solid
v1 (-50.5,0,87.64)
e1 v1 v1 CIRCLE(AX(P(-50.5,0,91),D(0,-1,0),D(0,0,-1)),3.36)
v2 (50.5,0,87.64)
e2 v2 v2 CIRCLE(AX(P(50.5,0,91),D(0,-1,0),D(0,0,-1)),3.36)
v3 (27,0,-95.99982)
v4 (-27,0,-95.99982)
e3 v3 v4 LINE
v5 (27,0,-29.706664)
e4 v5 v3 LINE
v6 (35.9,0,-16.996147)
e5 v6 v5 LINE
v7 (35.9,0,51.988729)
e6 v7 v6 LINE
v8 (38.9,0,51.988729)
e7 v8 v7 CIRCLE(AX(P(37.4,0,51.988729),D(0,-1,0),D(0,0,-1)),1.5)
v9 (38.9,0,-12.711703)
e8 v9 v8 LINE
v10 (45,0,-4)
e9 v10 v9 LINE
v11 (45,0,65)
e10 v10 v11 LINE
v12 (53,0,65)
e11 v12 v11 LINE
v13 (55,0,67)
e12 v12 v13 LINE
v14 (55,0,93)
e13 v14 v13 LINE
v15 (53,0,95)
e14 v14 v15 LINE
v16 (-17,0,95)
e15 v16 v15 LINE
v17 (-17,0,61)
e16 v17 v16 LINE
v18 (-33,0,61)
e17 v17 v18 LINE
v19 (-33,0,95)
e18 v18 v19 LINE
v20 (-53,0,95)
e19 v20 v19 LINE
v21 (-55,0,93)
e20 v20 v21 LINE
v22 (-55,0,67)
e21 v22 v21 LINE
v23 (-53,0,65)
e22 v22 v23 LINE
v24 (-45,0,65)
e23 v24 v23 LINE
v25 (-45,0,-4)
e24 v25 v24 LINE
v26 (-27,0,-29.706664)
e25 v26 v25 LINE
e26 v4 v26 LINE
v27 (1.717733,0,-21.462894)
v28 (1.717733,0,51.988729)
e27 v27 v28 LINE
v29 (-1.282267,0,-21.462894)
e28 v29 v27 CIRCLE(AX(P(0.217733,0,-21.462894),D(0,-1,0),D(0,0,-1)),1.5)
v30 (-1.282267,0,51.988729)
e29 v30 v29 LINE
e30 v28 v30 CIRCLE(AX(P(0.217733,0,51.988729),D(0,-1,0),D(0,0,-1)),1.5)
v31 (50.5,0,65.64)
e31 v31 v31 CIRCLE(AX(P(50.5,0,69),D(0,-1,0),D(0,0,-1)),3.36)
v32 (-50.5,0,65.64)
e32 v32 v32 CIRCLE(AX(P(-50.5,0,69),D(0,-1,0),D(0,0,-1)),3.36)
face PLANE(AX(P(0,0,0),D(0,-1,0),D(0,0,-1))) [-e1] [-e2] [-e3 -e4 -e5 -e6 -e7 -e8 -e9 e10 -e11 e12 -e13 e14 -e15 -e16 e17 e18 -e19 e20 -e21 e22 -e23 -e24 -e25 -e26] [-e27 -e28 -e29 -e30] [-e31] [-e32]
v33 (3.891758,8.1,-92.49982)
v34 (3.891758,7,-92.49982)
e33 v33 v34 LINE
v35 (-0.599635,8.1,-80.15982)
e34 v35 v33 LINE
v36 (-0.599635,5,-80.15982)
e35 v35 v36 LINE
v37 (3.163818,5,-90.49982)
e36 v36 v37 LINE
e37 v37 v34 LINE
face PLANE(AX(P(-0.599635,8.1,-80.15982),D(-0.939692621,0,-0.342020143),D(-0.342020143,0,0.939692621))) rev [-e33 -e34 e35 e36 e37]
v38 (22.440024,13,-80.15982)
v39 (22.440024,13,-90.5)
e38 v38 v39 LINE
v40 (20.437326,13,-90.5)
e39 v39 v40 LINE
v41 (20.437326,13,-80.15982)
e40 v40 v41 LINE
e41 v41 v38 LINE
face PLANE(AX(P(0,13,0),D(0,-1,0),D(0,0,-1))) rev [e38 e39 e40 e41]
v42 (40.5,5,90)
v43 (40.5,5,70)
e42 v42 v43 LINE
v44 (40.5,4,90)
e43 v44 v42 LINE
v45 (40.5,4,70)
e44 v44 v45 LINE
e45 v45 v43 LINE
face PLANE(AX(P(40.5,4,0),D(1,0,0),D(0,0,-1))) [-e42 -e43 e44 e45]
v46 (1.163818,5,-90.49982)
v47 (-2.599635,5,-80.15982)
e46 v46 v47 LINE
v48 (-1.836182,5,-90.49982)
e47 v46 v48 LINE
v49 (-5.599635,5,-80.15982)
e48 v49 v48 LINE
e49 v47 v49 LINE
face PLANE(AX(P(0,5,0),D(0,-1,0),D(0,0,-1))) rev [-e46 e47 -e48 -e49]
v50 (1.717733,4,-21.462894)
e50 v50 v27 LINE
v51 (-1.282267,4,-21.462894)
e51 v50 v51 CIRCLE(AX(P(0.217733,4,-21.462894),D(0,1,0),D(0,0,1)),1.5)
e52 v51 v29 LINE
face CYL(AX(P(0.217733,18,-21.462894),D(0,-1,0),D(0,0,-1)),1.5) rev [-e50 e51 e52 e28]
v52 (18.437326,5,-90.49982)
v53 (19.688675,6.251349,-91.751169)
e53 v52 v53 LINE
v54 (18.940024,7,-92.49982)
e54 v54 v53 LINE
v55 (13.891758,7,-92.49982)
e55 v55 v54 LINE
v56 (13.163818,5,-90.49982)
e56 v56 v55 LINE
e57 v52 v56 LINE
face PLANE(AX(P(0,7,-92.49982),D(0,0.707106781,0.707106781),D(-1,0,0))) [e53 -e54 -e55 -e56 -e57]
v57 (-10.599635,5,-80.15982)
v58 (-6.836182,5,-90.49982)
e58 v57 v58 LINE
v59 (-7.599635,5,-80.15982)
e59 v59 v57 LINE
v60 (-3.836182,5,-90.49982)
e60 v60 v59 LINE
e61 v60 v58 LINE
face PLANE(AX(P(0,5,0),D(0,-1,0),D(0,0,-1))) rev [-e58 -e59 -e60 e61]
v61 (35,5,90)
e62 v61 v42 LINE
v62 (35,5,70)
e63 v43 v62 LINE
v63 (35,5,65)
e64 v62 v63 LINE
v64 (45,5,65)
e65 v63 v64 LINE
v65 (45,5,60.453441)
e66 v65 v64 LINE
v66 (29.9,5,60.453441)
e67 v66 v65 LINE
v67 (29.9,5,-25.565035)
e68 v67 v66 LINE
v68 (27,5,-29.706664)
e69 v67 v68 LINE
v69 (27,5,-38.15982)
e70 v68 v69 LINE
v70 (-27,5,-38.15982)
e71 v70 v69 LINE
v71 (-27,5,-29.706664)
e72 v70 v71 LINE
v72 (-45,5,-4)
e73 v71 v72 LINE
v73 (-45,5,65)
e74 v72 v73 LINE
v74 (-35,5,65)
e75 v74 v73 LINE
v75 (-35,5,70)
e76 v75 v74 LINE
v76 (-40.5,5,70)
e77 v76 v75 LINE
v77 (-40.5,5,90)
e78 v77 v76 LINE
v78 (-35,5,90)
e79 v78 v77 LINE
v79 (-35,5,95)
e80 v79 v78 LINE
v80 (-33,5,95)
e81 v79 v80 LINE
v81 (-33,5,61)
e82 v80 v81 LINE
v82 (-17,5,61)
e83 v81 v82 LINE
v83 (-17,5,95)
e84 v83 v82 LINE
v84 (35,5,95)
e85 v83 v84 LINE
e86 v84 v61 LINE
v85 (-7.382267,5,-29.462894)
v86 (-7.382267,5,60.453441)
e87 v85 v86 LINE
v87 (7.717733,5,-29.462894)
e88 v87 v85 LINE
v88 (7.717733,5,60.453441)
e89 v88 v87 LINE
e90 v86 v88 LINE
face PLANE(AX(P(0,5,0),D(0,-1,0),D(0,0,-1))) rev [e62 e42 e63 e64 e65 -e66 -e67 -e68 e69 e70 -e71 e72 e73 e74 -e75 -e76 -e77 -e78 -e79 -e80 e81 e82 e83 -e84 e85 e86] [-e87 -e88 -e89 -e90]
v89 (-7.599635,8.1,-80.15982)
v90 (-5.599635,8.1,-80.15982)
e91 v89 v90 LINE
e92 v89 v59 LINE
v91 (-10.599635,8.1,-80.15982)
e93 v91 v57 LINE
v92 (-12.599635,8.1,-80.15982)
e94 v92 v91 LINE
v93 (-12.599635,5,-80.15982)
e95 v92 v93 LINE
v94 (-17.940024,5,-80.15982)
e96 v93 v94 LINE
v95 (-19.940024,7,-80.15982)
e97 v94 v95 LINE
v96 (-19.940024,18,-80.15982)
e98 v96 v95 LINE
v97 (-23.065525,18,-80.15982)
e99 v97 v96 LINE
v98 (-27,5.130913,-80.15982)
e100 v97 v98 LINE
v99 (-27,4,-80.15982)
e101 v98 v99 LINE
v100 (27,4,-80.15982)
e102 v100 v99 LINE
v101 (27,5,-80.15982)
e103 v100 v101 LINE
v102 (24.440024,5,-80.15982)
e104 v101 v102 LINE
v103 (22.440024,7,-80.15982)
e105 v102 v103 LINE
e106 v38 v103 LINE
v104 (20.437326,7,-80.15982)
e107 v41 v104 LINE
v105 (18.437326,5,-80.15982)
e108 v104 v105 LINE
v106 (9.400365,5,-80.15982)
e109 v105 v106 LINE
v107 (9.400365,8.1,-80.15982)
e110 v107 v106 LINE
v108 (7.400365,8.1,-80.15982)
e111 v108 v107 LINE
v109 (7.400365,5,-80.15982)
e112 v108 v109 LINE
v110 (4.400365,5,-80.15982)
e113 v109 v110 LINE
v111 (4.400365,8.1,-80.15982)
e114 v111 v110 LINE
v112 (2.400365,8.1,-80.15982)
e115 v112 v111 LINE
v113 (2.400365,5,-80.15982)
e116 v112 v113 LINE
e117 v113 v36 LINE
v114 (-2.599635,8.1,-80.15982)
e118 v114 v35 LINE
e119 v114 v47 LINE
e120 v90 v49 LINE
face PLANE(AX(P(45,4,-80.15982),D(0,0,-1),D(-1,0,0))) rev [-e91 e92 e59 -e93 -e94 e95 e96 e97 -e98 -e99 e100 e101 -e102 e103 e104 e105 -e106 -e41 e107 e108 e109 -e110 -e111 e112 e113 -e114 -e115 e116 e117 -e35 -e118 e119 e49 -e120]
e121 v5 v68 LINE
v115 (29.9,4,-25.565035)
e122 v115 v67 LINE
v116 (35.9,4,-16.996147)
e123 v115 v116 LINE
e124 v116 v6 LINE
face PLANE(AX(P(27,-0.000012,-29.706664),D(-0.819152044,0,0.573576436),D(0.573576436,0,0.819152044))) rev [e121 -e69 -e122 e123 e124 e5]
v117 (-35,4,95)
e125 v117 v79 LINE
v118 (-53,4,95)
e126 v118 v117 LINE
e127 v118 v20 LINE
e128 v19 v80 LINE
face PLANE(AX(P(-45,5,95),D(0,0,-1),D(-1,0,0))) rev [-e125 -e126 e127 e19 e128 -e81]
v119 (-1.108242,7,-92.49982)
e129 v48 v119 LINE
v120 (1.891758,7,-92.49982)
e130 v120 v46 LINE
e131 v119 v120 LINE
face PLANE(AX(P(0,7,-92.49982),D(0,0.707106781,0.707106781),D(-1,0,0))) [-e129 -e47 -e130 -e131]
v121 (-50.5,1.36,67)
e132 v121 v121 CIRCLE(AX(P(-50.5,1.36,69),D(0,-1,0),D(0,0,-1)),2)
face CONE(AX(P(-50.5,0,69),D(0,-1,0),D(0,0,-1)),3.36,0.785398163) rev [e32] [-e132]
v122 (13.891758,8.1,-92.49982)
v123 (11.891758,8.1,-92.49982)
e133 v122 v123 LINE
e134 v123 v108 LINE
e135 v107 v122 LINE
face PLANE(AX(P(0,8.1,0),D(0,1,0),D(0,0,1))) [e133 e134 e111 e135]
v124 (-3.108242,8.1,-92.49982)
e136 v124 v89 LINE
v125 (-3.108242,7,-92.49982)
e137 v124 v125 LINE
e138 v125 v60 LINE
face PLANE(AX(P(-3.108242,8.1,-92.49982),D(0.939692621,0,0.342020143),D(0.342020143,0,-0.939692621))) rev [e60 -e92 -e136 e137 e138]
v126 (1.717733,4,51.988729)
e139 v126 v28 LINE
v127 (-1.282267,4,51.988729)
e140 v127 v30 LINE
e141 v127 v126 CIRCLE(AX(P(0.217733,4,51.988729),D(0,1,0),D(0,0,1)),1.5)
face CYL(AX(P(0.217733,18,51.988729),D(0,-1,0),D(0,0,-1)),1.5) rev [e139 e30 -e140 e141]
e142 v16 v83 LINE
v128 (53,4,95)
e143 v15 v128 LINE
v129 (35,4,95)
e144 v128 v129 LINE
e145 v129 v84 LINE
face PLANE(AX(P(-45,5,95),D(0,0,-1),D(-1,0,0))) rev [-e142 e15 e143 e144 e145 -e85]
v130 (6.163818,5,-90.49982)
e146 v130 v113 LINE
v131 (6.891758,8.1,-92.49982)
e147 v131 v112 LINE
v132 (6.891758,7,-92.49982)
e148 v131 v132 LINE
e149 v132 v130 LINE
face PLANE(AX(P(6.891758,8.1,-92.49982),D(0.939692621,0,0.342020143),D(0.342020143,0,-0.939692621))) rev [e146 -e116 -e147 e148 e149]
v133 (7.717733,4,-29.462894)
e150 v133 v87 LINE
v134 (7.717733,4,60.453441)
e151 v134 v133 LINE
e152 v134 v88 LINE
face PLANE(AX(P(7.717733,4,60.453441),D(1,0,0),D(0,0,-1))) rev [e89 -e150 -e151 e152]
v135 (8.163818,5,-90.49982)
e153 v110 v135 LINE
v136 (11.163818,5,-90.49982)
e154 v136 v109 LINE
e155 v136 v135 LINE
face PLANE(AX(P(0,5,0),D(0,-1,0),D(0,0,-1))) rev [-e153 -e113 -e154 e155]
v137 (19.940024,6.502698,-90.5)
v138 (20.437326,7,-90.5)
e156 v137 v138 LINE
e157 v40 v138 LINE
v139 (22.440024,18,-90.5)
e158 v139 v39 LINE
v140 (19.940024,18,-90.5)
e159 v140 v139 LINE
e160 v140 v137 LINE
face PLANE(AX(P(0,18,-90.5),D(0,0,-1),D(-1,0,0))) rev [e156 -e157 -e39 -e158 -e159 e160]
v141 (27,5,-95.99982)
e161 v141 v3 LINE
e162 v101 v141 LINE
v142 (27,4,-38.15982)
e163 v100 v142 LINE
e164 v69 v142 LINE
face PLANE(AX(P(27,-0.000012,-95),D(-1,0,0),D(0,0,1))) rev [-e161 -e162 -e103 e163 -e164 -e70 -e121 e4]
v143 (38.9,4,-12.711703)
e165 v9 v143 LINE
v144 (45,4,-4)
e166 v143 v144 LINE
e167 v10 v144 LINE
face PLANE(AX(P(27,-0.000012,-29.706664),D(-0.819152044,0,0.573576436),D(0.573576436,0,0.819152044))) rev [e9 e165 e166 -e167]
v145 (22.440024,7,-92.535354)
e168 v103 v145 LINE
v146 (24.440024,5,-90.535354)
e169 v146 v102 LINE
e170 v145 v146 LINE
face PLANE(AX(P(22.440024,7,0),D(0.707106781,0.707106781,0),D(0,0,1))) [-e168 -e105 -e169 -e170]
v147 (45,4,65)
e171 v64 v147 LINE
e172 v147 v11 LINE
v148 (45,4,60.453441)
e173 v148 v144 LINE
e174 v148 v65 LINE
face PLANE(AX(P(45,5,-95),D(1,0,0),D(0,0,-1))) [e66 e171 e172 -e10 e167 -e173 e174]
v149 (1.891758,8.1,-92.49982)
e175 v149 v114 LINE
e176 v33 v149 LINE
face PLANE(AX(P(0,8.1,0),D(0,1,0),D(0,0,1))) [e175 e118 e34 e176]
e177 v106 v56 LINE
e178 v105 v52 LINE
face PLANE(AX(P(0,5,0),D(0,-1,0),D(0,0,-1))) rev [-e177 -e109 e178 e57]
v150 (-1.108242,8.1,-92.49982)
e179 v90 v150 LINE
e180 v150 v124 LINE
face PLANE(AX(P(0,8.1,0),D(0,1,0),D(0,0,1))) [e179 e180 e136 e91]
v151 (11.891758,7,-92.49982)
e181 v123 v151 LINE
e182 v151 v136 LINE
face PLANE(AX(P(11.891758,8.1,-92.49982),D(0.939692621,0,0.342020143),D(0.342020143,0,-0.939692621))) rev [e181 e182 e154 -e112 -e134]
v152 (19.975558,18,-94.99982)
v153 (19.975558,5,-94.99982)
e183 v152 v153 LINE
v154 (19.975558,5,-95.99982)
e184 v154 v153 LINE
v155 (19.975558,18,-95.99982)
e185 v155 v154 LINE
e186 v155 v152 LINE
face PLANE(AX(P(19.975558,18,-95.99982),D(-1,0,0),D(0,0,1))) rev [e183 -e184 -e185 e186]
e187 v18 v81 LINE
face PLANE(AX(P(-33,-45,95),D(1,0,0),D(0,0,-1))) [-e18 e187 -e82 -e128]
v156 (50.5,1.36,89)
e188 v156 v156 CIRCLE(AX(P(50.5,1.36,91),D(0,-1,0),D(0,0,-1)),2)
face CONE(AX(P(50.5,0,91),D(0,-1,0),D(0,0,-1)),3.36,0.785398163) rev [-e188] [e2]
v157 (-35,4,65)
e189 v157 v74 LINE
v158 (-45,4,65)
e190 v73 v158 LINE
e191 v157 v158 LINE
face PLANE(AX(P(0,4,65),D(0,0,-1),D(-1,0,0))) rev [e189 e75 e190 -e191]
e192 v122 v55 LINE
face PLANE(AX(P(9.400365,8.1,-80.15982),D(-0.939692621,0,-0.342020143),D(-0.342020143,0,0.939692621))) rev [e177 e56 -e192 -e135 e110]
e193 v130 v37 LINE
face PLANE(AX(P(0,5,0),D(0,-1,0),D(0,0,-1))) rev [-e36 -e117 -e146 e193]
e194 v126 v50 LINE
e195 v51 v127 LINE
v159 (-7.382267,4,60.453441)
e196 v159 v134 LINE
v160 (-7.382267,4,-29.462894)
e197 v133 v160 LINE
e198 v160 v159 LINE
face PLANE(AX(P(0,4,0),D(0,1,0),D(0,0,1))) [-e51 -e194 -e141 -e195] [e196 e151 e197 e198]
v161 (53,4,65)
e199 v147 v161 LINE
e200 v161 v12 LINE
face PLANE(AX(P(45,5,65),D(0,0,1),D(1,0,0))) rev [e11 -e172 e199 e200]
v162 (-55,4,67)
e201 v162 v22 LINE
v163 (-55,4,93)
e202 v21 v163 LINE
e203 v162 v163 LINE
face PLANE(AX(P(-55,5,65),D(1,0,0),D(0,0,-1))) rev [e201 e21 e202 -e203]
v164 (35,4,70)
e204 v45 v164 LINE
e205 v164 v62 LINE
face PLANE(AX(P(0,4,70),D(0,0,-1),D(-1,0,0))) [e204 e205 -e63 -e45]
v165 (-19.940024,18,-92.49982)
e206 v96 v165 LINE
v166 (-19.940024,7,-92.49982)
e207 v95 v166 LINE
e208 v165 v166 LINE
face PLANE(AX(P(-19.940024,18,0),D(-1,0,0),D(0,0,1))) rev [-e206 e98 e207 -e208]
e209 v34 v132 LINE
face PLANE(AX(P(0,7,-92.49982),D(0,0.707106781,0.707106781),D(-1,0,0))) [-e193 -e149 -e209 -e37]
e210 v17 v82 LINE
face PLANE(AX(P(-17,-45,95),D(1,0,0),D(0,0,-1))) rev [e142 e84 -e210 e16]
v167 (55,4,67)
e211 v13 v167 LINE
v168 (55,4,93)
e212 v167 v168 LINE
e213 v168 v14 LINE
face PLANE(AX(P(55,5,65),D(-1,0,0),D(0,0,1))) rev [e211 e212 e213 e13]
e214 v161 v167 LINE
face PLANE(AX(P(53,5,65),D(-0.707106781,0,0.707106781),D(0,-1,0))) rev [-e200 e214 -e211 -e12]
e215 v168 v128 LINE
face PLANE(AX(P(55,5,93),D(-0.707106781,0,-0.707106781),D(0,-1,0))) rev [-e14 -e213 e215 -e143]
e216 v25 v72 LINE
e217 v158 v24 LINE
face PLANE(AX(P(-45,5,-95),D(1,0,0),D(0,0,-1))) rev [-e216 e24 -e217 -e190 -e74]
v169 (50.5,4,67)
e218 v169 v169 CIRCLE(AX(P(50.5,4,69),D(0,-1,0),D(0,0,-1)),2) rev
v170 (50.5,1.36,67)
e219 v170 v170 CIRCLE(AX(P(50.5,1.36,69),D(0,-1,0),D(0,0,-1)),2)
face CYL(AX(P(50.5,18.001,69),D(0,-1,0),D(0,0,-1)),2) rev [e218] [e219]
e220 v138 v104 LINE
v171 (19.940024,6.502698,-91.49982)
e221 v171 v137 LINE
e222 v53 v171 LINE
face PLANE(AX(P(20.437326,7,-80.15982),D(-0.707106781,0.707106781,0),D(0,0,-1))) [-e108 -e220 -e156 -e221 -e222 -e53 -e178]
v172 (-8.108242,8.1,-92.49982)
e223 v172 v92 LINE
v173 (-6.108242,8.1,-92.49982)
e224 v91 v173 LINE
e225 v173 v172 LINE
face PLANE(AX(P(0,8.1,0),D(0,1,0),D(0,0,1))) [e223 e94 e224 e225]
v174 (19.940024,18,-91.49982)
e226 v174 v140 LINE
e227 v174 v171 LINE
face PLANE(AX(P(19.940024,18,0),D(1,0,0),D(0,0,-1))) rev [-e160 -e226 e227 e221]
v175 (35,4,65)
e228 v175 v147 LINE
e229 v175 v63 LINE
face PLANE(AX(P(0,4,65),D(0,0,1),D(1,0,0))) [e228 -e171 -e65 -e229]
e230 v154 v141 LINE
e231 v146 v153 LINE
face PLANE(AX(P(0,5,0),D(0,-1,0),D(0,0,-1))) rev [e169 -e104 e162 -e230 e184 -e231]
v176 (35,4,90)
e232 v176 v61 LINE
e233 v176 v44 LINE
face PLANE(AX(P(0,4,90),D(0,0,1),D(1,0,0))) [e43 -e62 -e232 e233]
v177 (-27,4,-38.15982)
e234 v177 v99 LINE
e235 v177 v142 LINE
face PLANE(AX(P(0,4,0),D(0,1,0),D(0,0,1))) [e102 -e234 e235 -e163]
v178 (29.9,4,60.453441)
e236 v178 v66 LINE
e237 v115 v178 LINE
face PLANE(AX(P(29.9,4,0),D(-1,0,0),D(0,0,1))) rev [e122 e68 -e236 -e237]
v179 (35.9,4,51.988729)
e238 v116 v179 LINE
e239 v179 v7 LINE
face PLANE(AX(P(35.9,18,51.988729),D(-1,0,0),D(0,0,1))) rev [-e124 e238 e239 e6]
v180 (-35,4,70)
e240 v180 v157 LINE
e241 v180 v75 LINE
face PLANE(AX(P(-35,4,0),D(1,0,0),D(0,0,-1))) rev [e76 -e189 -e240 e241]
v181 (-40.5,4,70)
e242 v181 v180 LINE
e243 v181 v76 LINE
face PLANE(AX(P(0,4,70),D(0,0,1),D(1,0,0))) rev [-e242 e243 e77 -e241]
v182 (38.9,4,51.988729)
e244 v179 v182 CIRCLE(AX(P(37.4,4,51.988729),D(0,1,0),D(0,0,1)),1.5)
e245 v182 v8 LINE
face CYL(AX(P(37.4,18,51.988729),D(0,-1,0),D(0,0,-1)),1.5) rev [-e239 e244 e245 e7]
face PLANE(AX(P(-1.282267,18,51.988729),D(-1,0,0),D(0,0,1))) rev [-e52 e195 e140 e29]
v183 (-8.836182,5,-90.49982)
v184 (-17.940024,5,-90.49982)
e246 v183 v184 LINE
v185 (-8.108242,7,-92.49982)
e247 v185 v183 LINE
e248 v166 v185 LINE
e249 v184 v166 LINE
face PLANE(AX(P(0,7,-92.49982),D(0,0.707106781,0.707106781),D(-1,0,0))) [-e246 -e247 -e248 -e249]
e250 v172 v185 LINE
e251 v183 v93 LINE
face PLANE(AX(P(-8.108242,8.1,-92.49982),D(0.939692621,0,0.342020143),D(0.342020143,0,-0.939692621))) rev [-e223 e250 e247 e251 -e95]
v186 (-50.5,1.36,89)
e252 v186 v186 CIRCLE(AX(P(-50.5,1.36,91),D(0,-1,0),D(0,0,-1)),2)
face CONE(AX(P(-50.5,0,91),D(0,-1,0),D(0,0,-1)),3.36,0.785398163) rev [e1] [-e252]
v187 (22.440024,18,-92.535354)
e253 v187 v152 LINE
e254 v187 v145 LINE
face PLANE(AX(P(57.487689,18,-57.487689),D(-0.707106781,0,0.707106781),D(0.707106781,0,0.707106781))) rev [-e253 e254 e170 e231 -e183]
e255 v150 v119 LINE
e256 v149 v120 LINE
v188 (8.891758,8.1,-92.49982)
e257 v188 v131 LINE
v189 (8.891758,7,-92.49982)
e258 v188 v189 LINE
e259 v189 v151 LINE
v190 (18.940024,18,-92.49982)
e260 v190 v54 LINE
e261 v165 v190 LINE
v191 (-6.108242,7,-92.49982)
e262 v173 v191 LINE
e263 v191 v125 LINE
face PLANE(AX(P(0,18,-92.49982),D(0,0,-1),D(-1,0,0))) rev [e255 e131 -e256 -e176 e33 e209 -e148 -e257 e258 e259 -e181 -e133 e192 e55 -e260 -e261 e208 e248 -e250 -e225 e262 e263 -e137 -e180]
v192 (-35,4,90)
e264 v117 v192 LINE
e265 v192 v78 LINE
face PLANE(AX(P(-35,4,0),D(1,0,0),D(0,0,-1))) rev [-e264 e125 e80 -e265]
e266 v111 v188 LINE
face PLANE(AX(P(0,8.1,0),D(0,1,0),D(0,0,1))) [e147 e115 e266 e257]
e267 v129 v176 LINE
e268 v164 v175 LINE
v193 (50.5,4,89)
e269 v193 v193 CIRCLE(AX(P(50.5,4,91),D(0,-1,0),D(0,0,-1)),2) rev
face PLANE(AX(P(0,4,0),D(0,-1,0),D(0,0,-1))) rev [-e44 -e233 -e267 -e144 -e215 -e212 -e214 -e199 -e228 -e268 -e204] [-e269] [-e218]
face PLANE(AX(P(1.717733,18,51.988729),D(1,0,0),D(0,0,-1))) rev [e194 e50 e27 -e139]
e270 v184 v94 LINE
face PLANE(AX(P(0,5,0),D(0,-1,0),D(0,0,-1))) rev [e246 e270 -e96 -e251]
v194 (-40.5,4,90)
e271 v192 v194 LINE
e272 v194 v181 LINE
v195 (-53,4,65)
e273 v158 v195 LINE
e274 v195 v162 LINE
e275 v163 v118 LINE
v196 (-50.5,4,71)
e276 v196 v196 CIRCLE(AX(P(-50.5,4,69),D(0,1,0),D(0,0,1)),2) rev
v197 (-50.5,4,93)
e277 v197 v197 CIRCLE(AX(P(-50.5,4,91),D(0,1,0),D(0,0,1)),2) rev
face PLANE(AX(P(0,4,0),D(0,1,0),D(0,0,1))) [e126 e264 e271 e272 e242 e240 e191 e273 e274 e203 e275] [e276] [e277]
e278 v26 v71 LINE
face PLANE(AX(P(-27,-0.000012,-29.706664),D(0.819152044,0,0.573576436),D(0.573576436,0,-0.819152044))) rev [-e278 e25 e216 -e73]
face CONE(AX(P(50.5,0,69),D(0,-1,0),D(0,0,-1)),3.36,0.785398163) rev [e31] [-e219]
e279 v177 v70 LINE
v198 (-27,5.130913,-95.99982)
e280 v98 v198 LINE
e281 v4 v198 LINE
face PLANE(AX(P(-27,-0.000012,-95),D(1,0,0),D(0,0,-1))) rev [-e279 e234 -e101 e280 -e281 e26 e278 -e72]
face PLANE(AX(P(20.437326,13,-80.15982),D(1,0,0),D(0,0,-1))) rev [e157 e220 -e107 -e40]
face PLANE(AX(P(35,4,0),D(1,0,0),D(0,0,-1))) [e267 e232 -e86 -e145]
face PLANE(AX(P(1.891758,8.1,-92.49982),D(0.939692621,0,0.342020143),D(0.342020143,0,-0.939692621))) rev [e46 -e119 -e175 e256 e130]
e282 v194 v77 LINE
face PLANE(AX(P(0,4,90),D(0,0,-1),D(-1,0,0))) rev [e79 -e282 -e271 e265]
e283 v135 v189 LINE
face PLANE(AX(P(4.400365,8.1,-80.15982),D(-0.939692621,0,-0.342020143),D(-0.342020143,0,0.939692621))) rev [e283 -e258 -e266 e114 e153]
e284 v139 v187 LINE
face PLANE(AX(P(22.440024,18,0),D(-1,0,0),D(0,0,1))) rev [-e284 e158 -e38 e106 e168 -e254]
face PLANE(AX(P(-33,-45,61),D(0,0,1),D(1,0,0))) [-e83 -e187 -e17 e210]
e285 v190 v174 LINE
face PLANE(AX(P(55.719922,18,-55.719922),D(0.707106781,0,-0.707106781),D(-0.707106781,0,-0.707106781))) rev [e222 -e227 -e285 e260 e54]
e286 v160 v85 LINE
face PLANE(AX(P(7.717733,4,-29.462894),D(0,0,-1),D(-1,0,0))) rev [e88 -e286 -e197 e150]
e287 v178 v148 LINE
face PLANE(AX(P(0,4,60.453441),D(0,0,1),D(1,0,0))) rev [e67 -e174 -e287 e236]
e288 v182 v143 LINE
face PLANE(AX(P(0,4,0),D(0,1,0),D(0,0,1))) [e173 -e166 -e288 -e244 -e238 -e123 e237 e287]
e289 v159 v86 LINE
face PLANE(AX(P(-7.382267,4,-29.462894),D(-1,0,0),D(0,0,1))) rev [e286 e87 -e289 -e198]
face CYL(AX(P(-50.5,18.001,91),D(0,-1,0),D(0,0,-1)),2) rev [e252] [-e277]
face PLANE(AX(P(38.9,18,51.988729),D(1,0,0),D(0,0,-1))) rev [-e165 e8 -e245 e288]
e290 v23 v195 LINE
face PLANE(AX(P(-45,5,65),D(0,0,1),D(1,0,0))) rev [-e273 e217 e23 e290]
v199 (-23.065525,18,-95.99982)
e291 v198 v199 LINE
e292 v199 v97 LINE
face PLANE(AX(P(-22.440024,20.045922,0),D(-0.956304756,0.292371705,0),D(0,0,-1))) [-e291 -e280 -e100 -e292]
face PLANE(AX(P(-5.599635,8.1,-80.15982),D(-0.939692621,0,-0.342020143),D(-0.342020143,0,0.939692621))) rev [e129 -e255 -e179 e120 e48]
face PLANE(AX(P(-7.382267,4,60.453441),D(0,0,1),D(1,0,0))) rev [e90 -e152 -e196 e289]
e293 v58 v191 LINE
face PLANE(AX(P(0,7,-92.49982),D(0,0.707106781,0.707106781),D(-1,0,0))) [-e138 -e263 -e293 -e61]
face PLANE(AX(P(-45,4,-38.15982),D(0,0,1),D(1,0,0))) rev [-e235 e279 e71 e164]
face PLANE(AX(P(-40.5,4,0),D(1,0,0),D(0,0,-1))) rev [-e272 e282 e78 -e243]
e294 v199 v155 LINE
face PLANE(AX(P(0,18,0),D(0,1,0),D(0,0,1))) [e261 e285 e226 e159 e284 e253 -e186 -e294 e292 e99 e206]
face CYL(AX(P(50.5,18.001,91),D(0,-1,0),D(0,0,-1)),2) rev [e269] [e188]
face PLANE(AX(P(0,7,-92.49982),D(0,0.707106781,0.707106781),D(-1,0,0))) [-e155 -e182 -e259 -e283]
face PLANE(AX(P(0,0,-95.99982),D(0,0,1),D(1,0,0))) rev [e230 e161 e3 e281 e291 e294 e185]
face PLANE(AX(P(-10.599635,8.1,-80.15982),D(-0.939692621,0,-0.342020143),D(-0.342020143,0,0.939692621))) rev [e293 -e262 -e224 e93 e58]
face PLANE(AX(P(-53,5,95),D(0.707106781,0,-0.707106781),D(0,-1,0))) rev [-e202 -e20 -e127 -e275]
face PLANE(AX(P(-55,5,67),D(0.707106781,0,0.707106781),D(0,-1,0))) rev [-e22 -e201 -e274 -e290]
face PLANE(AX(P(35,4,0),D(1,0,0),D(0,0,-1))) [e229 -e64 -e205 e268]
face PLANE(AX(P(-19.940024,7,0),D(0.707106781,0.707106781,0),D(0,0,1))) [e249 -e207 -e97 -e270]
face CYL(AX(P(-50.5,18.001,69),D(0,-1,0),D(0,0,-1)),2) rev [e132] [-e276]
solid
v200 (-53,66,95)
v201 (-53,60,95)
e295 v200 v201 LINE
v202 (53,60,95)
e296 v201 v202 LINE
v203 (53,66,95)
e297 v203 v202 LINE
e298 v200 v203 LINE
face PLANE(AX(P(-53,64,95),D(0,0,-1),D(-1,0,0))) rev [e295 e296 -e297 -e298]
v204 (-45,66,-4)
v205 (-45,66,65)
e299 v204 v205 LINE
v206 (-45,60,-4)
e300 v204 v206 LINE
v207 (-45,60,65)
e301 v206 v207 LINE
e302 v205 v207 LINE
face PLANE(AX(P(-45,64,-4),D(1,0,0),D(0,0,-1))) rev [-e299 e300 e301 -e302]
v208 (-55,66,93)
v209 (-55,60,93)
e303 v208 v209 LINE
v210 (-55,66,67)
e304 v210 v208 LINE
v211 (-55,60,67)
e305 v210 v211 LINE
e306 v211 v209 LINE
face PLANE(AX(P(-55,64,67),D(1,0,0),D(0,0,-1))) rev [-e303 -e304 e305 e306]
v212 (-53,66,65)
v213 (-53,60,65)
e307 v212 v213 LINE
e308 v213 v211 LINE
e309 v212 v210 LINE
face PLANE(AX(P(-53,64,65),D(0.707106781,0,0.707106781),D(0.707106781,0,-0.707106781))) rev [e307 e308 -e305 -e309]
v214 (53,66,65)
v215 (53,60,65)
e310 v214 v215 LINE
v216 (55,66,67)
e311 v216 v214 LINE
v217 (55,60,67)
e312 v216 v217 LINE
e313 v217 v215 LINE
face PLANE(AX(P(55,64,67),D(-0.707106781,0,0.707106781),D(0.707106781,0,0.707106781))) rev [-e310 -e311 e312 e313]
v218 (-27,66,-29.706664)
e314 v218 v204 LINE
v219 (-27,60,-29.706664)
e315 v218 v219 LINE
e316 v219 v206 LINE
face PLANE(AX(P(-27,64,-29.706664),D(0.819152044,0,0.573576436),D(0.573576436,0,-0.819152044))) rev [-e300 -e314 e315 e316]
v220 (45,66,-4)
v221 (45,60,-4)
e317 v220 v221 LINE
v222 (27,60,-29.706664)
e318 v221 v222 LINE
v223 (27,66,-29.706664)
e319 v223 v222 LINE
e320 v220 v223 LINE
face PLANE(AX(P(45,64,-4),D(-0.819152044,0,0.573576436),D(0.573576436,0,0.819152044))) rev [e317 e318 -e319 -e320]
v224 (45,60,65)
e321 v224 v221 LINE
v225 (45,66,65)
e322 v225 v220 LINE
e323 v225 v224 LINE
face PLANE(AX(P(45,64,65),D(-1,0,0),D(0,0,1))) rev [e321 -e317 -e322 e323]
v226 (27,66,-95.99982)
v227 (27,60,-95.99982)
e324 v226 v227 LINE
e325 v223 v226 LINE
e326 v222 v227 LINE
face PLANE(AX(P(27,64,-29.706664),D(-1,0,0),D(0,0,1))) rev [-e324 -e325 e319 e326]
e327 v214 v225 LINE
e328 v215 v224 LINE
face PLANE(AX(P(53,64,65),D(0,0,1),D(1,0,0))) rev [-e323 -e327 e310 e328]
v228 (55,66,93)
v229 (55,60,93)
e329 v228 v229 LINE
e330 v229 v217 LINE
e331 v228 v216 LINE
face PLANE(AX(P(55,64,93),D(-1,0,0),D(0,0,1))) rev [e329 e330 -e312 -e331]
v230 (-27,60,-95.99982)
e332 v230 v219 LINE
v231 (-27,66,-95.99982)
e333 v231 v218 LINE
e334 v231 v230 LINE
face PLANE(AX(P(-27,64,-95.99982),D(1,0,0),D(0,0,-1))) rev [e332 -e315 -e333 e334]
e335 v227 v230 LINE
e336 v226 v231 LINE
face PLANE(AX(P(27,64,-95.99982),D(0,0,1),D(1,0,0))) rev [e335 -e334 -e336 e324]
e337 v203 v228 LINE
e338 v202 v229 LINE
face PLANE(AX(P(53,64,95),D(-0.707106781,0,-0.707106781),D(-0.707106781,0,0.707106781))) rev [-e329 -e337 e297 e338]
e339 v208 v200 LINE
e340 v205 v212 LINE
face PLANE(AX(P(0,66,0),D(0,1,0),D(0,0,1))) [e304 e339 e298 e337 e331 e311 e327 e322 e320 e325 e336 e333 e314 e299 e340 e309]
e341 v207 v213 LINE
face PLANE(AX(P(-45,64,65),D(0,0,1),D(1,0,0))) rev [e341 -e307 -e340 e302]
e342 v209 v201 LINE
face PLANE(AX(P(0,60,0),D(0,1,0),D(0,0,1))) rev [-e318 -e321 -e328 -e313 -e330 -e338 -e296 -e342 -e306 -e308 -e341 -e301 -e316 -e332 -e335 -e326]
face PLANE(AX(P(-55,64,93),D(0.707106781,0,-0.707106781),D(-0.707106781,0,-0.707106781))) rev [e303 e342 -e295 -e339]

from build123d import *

# Parameters (mm, degrees)
SKETCH1_W                     = 90
SKETCH1_H                     = 190
BOSS_EXTRUDE1_DEPTH           = 5
SKETCH2_W                     = 10
SKETCH2_H                     = 30
BOSS_EXTRUDE2_DEPTH           = 5
CHAMFER1_SIZE                 = 2
SKETCH3_W                     = 16
SKETCH3_H                     = 34
CUT_EXTRUDE1_DEPTH            = 50
SKETCH4_W                     = 90
SKETCH4_H                     = 42
CUT_EXTRUDE2_DEPTH            = 1
SKETCH7_W                     = 15.1
SKETCH7_H                     = 89.916335477
CUT_EXTRUDE7_DEPTH            = 1
BOSS_EXTRUDE4_START           = 5
BOSS_EXTRUDE4_DEPTH           = 13
BOSS_EXTRUDE5_DEPTH           = 3.1
CUT_EXTRUDE11_START           = 5
CUT_EXTRUDE11_DEPTH           = 1
CUT_EXTRUDE12_DEPTH           = 112.23848255
CUT_EXTRUDE12_DEPTH_BACK      = 112.23848255
BOSS_EXTRUDE6_DEPTH           = 1
CHAMFER4_SIZE                 = 2
CUT_EXTRUDE13_REACH           = 114.094
SKETCH23_R                    = 2
CUT_EXTRUDE14_DEPTH           = 113.093556715
CUT_EXTRUDE14_DEPTH_BACK      = 113.093556715
SKETCH27_W                    = 2.002698481
SKETCH27_H                    = 10.340179912
BOSS_EXTRUDE7_DEPTH           = 8
CHAMFER5_SIZE                 = 2
CHAMFER6_SIZE                 = 15.045922045
CHAMFER6_SIZE_2               = 4.6
CHAMFER7_SIZE                 = 2
CSK_FOR_M3_SFHCS1_D           = 3.4
CSK_FOR_M3_SFHCS1_DEPTH       = 4
CSK_FOR_M3_SFHCS1_CSINK_D     = 6.72
CSK_FOR_M3_SFHCS1_CSINK_ANGLE = 90
CSK_FOR_M3_SFHCS1_TIP         = 1.021463052
BOSS_EXTRUDE8_START           = 60
BOSS_EXTRUDE8_DEPTH           = 4
BOSS_EXTRUDE9_DEPTH           = 2


with BuildPart() as part:
    # Sketch1 → Boss-Extrude1 (new body)
    with BuildSketch(Plane(origin=(0, 0, 0), x_dir=(1, 0, 0), z_dir=(0, 1, 0))):
        Rectangle(SKETCH1_W, SKETCH1_H)
    extrude(amount=BOSS_EXTRUDE1_DEPTH)

    # Sketch2 → Boss-Extrude2 (add)
    with BuildSketch(Plane(origin=(0, 0, 0), x_dir=(1, 0, 0), z_dir=(0, 1, 0))):
        with Locations((-50, -80)):
            Rectangle(SKETCH2_W, SKETCH2_H)
        with Locations((50, -80)):
            Rectangle(SKETCH2_W, SKETCH2_H)
    extrude(amount=BOSS_EXTRUDE2_DEPTH)

    # Chamfer1
    chamfer1_edges = [part.edges().sort_by_distance(p)[0] for p in [
        (-55, 2.5, 65),
        (-55, 2.5, 95),
        (55, 2.5, 95),
        (55, 2.5, 65),
    ]]
    chamfer(chamfer1_edges, length=CHAMFER1_SIZE)

    # Sketch3 → Cut-Extrude1 (cut)
    with BuildSketch(Plane(origin=(0, 5, 0), x_dir=(1, 0, 0), z_dir=(0, 1, 0))):
        with Locations((-25, -78)):
            Rectangle(SKETCH3_W, SKETCH3_H)
    extrude(amount=-CUT_EXTRUDE1_DEPTH, mode=Mode.SUBTRACT)

    # Sketch4 → Cut-Extrude2 (cut)
    with BuildSketch(Plane(origin=(0, 5, 0), x_dir=(1, 0, 0), z_dir=(0, 1, 0))):
        with Locations((0, 59.159820088)):
            Rectangle(SKETCH4_W, SKETCH4_H)
    extrude(amount=-CUT_EXTRUDE2_DEPTH, mode=Mode.SUBTRACT)

    # Sketch7 → Cut-Extrude7 (cut)
    with BuildSketch(Plane(origin=(0, 5, 0), x_dir=(1, 0, 0), z_dir=(0, 1, 0))):
        with Locations((37.45, -15.495273531)):
            Rectangle(SKETCH7_W, SKETCH7_H)
        with Locations((0.16773297, -15.495273531)):
            Rectangle(SKETCH7_W, SKETCH7_H)
    extrude(amount=-CUT_EXTRUDE7_DEPTH, mode=Mode.SUBTRACT)

    # Sketch17 → Boss-Extrude4 (add)
    with BuildSketch(Plane(origin=(0, 0, 0), x_dir=(1, 0, 0), z_dir=(0, 1, 0)).offset(BOSS_EXTRUDE4_START)):
        Polygon((-22.440023983, 80.159820088), (-19.940023983, 80.159820088), (-19.940023983, 92.499820088), (18.940023983, 92.499820088), (19.940023983, 91.499820088), (19.940023983, 90.5), (22.440023983, 90.5), (22.440023983, 92.535353994), (19.975557889, 94.999820088), (-22.440023983, 94.999820088), align=None)
    extrude(amount=BOSS_EXTRUDE4_DEPTH)

    # Sketch18 → Boss-Extrude5 (add)
    with BuildSketch(Plane(origin=(0, 5, 0), x_dir=(1, 0, 0), z_dir=(0, 1, 0))):
        Polygon((-12.599634528, 80.159820088), (-10.599634528, 80.159820088), (-6.108241837, 92.499820088), (-8.108241837, 92.499820088), align=None)
        Polygon((-3.108241837, 92.499820088), (-7.599634528, 80.159820088), (-5.599634528, 80.159820088), (-1.108241837, 92.499820088), align=None)
        Polygon((1.891758163, 92.499820088), (-2.599634528, 80.159820088), (-0.599634528, 80.159820088), (3.891758163, 92.499820088), align=None)
        Polygon((6.891758163, 92.499820088), (2.400365472, 80.159820088), (4.400365472, 80.159820088), (8.891758163, 92.499820088), align=None)
        Polygon((11.891758163, 92.499820088), (7.400365472, 80.159820088), (9.400365472, 80.159820088), (13.891758163, 92.499820088), align=None)
    extrude(amount=BOSS_EXTRUDE5_DEPTH)

    # Sketch19 → Cut-Extrude11 (cut)
    with BuildSketch(Plane(origin=(0, 0, 0), x_dir=(1, 0, 0), z_dir=(0, 1, 0)).offset(CUT_EXTRUDE11_START)):
        Polygon((-35, -65), (-35, -70), (-40.5, -70), (-40.5, -90), (-35, -90), (-35, -95), (-53, -95), (-55, -93), (-55, -67), (-53, -65), align=None)
    cut_extrude11 = extrude(amount=-CUT_EXTRUDE11_DEPTH, mode=Mode.SUBTRACT)

    # Mirror1: Cut-Extrude11 across plane
    add(cut_extrude11.mirror(Plane(origin=(0, 0, 0), x_dir=(0, 0, 1), z_dir=(1, 0, 0))), mode=Mode.SUBTRACT)

    # Sketch20 → Cut-Extrude12 (cut, two sides: drawn at the far end of the back side and taken through both)
    with BuildSketch(Plane(origin=(0, 0, 0), x_dir=(1, 0, 0), z_dir=(0, 1, 0)).offset(-CUT_EXTRUDE12_DEPTH_BACK)):
        Polygon((-27, 29.706664121), (-45, 4), (-45, 95), (-27, 95), align=None)
        Polygon((27, 95), (27, 29.706664121), (45, 4), (45, 95), align=None)
    extrude(amount=CUT_EXTRUDE12_DEPTH + CUT_EXTRUDE12_DEPTH_BACK, mode=Mode.SUBTRACT)

    # Sketch22 → Boss-Extrude6 (add)
    with BuildSketch(Plane(origin=(0, 0, -94.999820088), x_dir=(-1, 0, 0), z_dir=(0, 0, -1))):
        Polygon((-19.975557889, 5), (-27, 5), (-27, 0), (27, 0), (27, 5), (22.440023983, 5), (22.440023983, 18), (-19.975557889, 18), align=None)
    extrude(amount=BOSS_EXTRUDE6_DEPTH)

    # Chamfer4
    chamfer4_edges = [part.edges().sort_by_distance(p)[0] for p in [
        (-19.940023983, 5, -86.329820088),
        (-14.02413291, 5, -92.499820088),
        (-4.608241837, 5, -92.499820088),
        (0.391758163, 5, -92.499820088),
        (5.391758163, 5, -92.499820088),
        (10.391758163, 5, -92.499820088),
    ]]
    chamfer(chamfer4_edges, length=CHAMFER4_SIZE)

    # Sketch23 → Cut-Extrude13 (cut, up to next)
    with BuildSketch(Plane.XZ, mode=Mode.PRIVATE) as cut_extrude13_sk1:
        with Locations(Location((-50.5, 91, 0), (0, 0, 270))):
            Circle(SKETCH23_R)
    cut_extrude13_tool1 = extrude(cut_extrude13_sk1.sketch, amount=-CUT_EXTRUDE13_REACH, mode=Mode.PRIVATE) & part.part
    # Sketch23 → Cut-Extrude13 (cut, up to next)
    with BuildSketch(Plane.XZ, mode=Mode.PRIVATE) as cut_extrude13_sk2:
        with Locations(Location((-50.5, 69, 0), (0, 0, 270))):
            Circle(SKETCH23_R)
    cut_extrude13_tool2 = extrude(cut_extrude13_sk2.sketch, amount=-CUT_EXTRUDE13_REACH, mode=Mode.PRIVATE) & part.part
    # Sketch23 → Cut-Extrude13 (cut, up to next)
    with BuildSketch(Plane.XZ, mode=Mode.PRIVATE) as cut_extrude13_sk3:
        with Locations(Location((50.5, 69, 0), (0, 0, 270))):
            Circle(SKETCH23_R)
    cut_extrude13_tool3 = extrude(cut_extrude13_sk3.sketch, amount=-CUT_EXTRUDE13_REACH, mode=Mode.PRIVATE) & part.part
    # Sketch23 → Cut-Extrude13 (cut, up to next)
    with BuildSketch(Plane.XZ, mode=Mode.PRIVATE) as cut_extrude13_sk4:
        with Locations(Location((50.5, 91, 0), (0, 0, 270))):
            Circle(SKETCH23_R)
    cut_extrude13_tool4 = extrude(cut_extrude13_sk4.sketch, amount=-CUT_EXTRUDE13_REACH, mode=Mode.PRIVATE) & part.part
    add(cut_extrude13_tool1.solids().sort_by_distance((-50.5, 0, 91))[0], mode=Mode.SUBTRACT)
    add(cut_extrude13_tool2.solids().sort_by_distance((-50.5, 0, 69))[0], mode=Mode.SUBTRACT)
    add(cut_extrude13_tool3.solids().sort_by_distance((50.5, 0, 69))[0], mode=Mode.SUBTRACT)
    add(cut_extrude13_tool4.solids().sort_by_distance((50.5, 0, 91))[0], mode=Mode.SUBTRACT)

    # Sketch25 → Cut-Extrude14 (cut, two sides: drawn at the far end of the back side and taken through both)
    with BuildSketch(Plane.XZ.offset(-CUT_EXTRUDE14_DEPTH_BACK)):
        with BuildLine():
            Line((1.71773297, 51.988728589), (1.71773297, -21.462894208))
            ThreePointArc((1.71773297, -21.462894208), (0.21773297, -22.962894208), (-1.28226703, -21.462894208))
            Line((-1.28226703, -21.462894208), (-1.28226703, 51.988728589))
            ThreePointArc((-1.28226703, 51.988728589), (0.21773297, 53.488728589), (1.71773297, 51.988728589))
        make_face()
        with BuildLine():
            Line((38.9, 51.988728589), (38.9, -21.462894208))
            ThreePointArc((38.9, -21.462894208), (37.4, -22.962894208), (35.9, -21.462894208))
            Line((35.9, -21.462894208), (35.9, 51.988728589))
            ThreePointArc((35.9, 51.988728589), (37.4, 53.488728589), (38.9, 51.988728589))
        make_face()
    extrude(amount=CUT_EXTRUDE14_DEPTH + CUT_EXTRUDE14_DEPTH_BACK, mode=Mode.SUBTRACT)

    # Sketch27 → Boss-Extrude7 (add)
    with BuildSketch(Plane(origin=(0, 5, 0), x_dir=(1, 0, 0), z_dir=(0, 1, 0))):
        with Locations((21.438674742, 85.329910044)):
            Rectangle(SKETCH27_W, SKETCH27_H)
    extrude(amount=BOSS_EXTRUDE7_DEPTH)

    # Chamfer5
    chamfer5_edges = [part.edges().sort_by_distance(p)[0] for p in [
        (22.440023983, 5, -86.347587041),
    ]]
    chamfer(chamfer5_edges, length=CHAMFER5_SIZE)

    # Chamfer6
    # the kernel refuses this chamfer: 15.045922045, 4.6 mm, written as the material it adds along each edge
    with BuildSketch(Plane(origin=(-22.440023983, 5, -80.159820088), x_dir=(0.011263281176818154, 0.9999365672367082, 0), z_dir=(0, 0, -1))) as chamfer6_piece_1_section:
        Polygon((CHAMFER6_SIZE * 0.999936567239, -CHAMFER6_SIZE * 0.0112632811768), (-CHAMFER6_SIZE_2 * 0.0112632811768, -CHAMFER6_SIZE_2 * 0.999936567237), (0, 0), align=None)
    chamfer6_piece_1 = extrude(amount=15.84, mode=Mode.PRIVATE)
    chamfer6_piece_1 = split(chamfer6_piece_1, bisect_by=Plane(origin=(-23.998082586, 18, -88.079820088), z_dir=(0, -1, 0)), keep=Keep.TOP, mode=Mode.PRIVATE)
    chamfer6_piece_1 = split(chamfer6_piece_1, bisect_by=Plane(origin=(-27, 9.852411417, -88.079820088), z_dir=(1, 0, 0)), keep=Keep.TOP, mode=Mode.PRIVATE)
    add(chamfer6_piece_1)

    # Chamfer7
    # the kernel refuses this chamfer: 2 mm, written as the material it adds along each edge
    with BuildSketch(Plane(origin=(8.748392187, 5, -92.499820088), x_dir=(-2.155664593802373e-14, -0.027495876610586414, 0.9996219169112968), z_dir=(1, 0, 0))) as chamfer7_piece_1_section:
        Polygon((CHAMFER7_SIZE * 0.999621916911, -CHAMFER7_SIZE * 0.0274958766106), (-CHAMFER7_SIZE * 0.0274958766106, -CHAMFER7_SIZE * 0.999621916911), (0, 0), align=None)
    chamfer7_piece_1 = extrude(amount=15.334997772, mode=Mode.PRIVATE)
    chamfer7_piece_1 = split(chamfer7_piece_1, bisect_by=Plane(origin=(20.49595334, 8.944070643, -90.499940029), z_dir=(-0.7071067811865476, -0.7071067811865476, -1.2691553730131522e-15)), keep=Keep.TOP, mode=Mode.PRIVATE)
    chamfer7_piece_1 = split(chamfer7_piece_1, bisect_by=Plane(origin=(20.513690307, 5.000059971, -94.46168767), z_dir=(-0.7071067811865465, 0, 0.7071067811865486)), keep=Keep.TOP, mode=Mode.PRIVATE)
    add(chamfer7_piece_1)
    with BuildSketch(Plane(origin=(20.437325502, 5, -80.159820088), x_dir=(-0.9996219169112968, -0.02749587661058651, 0), z_dir=(0, 0, -1))) as chamfer7_piece_2_section:
        Polygon((CHAMFER7_SIZE * 0.999621916911, CHAMFER7_SIZE * 0.0274958766106), (-CHAMFER7_SIZE * 0.0274958766106, CHAMFER7_SIZE * 0.999621916911), (0, 0), align=None)
    chamfer7_piece_2 = extrude(amount=15.483545888, mode=Mode.PRIVATE)
    chamfer7_piece_2 = split(chamfer7_piece_2, bisect_by=Plane(origin=(24.542296211, 5.500899494, -90.433081766), z_dir=(-0.7071067811865465, 0, 0.7071067811865486)), keep=Keep.TOP, mode=Mode.PRIVATE)
    add(chamfer7_piece_2)

    # CSK for M3 SFHCS1
    with Locations(Plane(origin=(0, 0, 0), x_dir=(-1, 0, 0), z_dir=(0, -1, 0))):
        with Locations((-50.5, -91), (-50.5, -69), (50.5, -69), (50.5, -91)):
            CounterSinkHole(CSK_FOR_M3_SFHCS1_D / 2, CSK_FOR_M3_SFHCS1_CSINK_D / 2, depth=CSK_FOR_M3_SFHCS1_DEPTH, counter_sink_angle=CSK_FOR_M3_SFHCS1_CSINK_ANGLE)
            with Locations((0, 0, -(CSK_FOR_M3_SFHCS1_DEPTH + CSK_FOR_M3_SFHCS1_TIP / 2))):  # 118° drill point
                Cone(0, CSK_FOR_M3_SFHCS1_D / 2, CSK_FOR_M3_SFHCS1_TIP, mode=Mode.SUBTRACT)


with BuildPart() as body_2:
    # Sketch31 → Boss-Extrude8 (new body)
    with BuildSketch(Plane(origin=(0, 0, 0), x_dir=(1, 0, 0), z_dir=(0, 1, 0)).offset(BOSS_EXTRUDE8_START)):
        Polygon((-27, 95.999820088), (-27, 29.706664121), (-45, 4), (-45, -65), (-53, -65), (-55, -67), (-55, -93), (-53, -95), (53, -95), (55, -93), (55, -67), (53, -65), (45, -65), (45, 4), (27, 29.706664121), (27, 95.999820088), align=None)
    extrude(amount=BOSS_EXTRUDE8_DEPTH)

    # Sketch32 → Boss-Extrude9 (add)
    with BuildSketch(Plane(origin=(0, 64, 0), x_dir=(1, 0, 0), z_dir=(0, 1, 0))):
        Polygon((27, 29.706664121), (27, 95.999820088), (-27, 95.999820088), (-27, 29.706664121), (-45, 4), (-45, -65), (-53, -65), (-55, -67), (-55, -93), (-53, -95), (53, -95), (55, -93), (55, -67), (53, -65), (45, -65), (45, 4), align=None)
    extrude(amount=BOSS_EXTRUDE9_DEPTH)


solid = Compound([part.part, body_2.part])
